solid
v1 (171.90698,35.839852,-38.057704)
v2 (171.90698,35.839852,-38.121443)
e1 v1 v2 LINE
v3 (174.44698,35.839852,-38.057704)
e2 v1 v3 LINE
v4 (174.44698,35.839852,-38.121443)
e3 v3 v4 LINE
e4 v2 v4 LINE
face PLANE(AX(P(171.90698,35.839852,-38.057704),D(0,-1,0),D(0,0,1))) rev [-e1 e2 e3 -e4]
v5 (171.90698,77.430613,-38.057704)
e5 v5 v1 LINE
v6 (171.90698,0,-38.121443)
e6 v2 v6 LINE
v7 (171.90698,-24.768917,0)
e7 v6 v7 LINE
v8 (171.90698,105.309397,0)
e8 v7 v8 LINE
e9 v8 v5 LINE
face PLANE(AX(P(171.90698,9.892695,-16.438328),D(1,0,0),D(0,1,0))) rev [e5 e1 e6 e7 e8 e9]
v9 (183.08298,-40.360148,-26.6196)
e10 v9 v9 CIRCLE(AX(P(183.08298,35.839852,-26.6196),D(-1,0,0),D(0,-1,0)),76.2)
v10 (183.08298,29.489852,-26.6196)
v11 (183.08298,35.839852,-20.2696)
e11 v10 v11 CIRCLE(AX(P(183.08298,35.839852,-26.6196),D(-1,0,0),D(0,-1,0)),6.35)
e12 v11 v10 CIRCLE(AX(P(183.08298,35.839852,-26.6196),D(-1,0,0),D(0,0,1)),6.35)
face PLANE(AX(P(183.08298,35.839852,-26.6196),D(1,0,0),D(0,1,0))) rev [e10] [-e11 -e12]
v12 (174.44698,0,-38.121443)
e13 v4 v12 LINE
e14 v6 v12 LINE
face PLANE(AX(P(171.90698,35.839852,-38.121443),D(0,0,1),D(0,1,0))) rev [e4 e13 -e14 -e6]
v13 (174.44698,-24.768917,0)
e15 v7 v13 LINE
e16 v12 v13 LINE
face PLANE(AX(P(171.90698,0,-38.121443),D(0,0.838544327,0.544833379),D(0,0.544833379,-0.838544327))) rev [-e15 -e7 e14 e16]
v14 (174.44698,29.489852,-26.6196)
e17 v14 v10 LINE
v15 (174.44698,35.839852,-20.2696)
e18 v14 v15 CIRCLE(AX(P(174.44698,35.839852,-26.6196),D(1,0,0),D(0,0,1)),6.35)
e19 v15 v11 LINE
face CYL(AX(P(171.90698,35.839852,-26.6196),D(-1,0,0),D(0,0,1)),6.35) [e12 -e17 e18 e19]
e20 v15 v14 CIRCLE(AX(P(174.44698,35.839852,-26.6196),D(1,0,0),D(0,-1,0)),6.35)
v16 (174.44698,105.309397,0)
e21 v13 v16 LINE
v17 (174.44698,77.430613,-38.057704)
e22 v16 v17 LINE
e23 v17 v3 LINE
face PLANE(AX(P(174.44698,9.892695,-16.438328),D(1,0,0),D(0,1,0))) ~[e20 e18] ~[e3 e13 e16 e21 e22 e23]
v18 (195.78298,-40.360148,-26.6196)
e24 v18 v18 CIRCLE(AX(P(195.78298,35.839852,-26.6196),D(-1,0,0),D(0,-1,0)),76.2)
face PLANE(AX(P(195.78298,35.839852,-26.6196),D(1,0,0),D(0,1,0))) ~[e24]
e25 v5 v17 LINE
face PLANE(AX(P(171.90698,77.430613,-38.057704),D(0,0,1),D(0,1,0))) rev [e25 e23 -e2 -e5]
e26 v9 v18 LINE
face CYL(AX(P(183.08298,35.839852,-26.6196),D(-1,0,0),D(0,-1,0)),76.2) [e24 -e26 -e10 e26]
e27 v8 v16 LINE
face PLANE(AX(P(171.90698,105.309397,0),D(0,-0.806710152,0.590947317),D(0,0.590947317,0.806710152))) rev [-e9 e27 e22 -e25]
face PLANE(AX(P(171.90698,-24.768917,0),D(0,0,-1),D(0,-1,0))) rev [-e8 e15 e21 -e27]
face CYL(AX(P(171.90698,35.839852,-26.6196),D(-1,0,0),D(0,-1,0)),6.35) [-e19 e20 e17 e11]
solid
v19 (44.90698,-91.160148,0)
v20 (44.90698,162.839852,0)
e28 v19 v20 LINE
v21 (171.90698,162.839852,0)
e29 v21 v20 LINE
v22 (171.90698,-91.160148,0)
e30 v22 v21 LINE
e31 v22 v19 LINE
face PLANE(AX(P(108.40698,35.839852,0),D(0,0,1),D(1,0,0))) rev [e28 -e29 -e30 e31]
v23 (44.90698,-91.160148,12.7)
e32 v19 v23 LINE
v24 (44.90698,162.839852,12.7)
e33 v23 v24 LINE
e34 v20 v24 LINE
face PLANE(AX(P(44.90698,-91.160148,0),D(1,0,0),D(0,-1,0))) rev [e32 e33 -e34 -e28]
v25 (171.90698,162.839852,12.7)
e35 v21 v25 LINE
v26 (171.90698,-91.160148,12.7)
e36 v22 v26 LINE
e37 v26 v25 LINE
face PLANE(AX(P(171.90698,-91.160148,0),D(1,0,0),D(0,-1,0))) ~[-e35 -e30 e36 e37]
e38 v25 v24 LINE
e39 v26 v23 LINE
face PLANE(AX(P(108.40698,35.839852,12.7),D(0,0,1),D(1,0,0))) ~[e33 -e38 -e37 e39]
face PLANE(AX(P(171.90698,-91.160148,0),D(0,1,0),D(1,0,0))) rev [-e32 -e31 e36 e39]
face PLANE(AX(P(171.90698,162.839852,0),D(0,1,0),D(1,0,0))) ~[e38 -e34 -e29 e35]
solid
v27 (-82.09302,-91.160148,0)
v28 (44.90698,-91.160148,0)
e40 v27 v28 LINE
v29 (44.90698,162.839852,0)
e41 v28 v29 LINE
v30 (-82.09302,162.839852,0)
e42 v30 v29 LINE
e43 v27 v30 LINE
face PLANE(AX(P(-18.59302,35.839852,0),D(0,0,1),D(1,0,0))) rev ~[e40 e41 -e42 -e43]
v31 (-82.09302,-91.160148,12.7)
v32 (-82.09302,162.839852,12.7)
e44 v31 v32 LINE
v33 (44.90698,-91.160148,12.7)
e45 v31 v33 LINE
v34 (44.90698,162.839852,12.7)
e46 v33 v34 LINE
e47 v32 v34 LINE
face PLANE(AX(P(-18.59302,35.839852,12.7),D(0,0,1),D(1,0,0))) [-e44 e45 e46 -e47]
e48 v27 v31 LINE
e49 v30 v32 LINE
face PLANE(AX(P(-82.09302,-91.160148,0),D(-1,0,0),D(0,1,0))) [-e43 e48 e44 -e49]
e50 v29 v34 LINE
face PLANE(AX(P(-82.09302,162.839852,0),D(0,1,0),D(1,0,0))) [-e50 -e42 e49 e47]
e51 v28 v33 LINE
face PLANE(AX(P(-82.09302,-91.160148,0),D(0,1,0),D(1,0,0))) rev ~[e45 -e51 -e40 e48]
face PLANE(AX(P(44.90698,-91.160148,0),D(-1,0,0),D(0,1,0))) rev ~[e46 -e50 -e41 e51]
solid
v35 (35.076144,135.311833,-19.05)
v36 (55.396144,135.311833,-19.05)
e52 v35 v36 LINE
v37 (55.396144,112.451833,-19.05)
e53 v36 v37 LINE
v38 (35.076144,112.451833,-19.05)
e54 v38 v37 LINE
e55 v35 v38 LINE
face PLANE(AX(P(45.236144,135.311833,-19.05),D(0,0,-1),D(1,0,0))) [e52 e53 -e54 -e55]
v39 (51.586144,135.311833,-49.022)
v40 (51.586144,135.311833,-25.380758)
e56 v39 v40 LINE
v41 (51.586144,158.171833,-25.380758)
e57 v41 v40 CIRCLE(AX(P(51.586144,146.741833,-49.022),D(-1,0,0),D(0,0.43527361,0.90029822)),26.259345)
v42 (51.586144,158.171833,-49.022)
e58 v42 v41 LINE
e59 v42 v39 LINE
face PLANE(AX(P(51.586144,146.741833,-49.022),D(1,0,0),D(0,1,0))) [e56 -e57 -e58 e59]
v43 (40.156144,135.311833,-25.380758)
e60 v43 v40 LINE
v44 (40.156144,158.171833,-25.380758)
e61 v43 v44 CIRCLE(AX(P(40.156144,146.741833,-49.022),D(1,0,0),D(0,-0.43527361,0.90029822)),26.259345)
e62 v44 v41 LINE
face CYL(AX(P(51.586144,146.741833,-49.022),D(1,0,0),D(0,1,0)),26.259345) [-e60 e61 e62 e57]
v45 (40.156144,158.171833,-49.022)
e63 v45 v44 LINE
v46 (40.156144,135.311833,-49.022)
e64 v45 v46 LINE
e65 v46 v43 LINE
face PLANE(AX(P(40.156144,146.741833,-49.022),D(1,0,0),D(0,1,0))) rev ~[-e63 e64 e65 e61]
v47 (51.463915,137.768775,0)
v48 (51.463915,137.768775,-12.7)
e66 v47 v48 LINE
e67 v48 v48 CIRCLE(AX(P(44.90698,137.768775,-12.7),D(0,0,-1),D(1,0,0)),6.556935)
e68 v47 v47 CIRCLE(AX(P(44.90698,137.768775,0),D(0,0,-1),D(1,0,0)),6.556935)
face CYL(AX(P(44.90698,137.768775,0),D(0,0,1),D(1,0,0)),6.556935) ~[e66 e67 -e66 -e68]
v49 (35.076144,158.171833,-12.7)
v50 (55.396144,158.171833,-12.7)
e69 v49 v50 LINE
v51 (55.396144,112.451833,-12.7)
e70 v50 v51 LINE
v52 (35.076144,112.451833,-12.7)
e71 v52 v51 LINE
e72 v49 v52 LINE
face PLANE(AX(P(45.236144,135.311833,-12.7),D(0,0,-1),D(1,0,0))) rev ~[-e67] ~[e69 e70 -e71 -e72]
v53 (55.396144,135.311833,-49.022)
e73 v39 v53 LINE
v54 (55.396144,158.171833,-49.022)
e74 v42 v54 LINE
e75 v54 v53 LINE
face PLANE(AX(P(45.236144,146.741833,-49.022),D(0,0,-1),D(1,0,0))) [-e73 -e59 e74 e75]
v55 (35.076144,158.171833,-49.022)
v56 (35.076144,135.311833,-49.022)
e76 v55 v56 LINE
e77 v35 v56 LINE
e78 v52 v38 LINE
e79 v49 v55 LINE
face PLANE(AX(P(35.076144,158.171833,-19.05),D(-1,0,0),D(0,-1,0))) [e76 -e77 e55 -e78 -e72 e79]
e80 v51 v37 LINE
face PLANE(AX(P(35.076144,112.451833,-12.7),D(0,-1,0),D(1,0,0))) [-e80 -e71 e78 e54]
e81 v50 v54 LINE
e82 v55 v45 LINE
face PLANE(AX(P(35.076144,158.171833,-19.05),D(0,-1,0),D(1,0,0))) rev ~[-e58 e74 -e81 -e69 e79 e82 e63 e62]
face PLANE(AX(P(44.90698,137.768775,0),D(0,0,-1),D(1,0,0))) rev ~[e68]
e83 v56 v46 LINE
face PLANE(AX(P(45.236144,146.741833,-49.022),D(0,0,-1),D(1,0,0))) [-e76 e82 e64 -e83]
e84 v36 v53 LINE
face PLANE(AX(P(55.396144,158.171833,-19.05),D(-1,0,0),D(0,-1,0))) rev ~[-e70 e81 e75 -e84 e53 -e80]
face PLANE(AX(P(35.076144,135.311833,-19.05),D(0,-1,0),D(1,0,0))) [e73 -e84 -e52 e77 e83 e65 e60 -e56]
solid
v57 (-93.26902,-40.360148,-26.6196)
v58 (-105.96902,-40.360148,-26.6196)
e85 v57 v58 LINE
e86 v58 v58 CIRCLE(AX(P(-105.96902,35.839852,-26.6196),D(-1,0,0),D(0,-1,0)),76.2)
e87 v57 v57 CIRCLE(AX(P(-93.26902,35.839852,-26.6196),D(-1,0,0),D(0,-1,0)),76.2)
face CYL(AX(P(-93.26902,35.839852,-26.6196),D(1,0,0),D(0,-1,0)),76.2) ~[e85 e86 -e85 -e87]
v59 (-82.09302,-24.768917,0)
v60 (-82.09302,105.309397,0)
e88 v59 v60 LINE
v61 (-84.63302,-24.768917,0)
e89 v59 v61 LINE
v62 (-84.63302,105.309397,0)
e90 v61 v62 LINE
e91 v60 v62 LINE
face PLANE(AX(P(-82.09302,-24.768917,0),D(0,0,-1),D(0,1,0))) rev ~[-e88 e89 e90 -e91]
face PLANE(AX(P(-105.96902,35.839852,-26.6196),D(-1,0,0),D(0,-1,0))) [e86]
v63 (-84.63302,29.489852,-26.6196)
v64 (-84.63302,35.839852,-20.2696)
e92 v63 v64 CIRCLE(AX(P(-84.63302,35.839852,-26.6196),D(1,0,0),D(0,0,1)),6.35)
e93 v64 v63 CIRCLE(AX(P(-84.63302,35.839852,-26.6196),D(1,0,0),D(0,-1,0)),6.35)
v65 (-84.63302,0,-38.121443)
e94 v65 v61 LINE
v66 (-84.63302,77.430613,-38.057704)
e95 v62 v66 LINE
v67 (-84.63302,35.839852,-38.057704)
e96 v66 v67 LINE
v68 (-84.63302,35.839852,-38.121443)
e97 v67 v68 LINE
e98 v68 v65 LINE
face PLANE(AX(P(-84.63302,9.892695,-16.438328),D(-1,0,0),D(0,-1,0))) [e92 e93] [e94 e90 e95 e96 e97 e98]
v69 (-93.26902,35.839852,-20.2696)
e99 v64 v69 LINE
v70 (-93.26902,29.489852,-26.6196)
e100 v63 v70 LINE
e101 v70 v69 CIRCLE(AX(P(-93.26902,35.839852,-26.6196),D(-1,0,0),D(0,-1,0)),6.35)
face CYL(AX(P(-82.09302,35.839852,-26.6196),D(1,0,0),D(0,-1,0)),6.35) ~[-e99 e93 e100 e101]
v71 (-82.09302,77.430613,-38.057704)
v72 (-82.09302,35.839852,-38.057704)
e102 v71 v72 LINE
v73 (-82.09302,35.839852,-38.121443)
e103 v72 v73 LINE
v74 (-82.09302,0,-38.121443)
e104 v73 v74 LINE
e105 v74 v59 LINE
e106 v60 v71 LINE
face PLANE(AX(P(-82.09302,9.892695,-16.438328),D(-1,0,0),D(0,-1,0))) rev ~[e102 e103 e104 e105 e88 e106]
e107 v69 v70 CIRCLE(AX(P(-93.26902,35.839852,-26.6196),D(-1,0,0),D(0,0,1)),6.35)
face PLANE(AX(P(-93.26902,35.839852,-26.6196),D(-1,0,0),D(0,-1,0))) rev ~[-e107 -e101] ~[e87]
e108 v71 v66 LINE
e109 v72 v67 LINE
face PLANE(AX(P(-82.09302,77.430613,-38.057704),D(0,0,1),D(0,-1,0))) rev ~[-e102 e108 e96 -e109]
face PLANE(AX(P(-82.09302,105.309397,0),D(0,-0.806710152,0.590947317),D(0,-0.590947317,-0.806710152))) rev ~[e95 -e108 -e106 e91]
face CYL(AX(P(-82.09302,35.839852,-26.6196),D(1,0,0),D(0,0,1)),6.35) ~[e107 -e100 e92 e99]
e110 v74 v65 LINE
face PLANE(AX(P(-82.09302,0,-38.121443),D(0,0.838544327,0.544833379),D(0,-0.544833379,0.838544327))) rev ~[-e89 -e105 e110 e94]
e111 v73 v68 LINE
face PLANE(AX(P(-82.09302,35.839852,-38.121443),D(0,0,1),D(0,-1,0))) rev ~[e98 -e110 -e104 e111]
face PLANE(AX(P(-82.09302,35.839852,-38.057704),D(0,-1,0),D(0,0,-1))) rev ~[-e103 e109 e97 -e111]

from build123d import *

# Parameters (mm, degrees)
F0_W      = 127
F0_H      = 254
F1_DEPTH  = 12.7
F3_DEPTH  = 11.176
F4_R      = 76.2
F5_DEPTH  = 12.7
F7_DEPTH  = 2.54
F12_R     = 6.556935049
F13_DEPTH = 12.7
F14_W     = 20.32
F14_H     = 45.72
F15_DEPTH = 6.35
F16_W     = 20.32
F16_H     = 22.86
F17_DEPTH = 29.972
F19_START = -3.81
F18_R     = 26.2593452301
F19_DEPTH = 11.43


# Not quite as in the source:
# - a feature names something its author has since deleted; it is built from what else it names
# - the program builds the solid bodies; features that only make, move or delete a surface that nothing else refers to are left out


with BuildPart() as f1:
    # F0 (on Top) → F1 (new body)
    with BuildSketch(Plane.XY):
        with Locations((-18.5930197371, 35.8398522526)):
            Rectangle(F0_W, F0_H)
    extrude(amount=F1_DEPTH)


with BuildPart() as f3:
    # F2 (on face) → F3 (new body)
    with BuildSketch(Plane(origin=(-82.0930197371, 0, 0), x_dir=(0, -1, 0), z_dir=(-1, 0, 0))):
        with BuildLine():
            ThreePointArc((-35.8398522526, -20.2696001321), (-40.3299803131, -31.1097281926), (-29.4898522526, -26.6196001321))
            ThreePointArc((-29.4898522526, -26.6196001321), (-31.3497241921, -22.1294720716), (-35.8398522526, -20.2696001321))
        make_face()
    extrude(amount=F3_DEPTH)

    # F4 (on face) → F5 (join)
    with BuildSketch(Plane(origin=(-93.2690197371, 0, 0), x_dir=(0, -1, 0), z_dir=(-1, 0, 0))):
        with Locations((-35.8398522526, -26.6196001321)):
            Circle(F4_R)
    extrude(amount=F5_DEPTH)

    # F6 (on face) → F7 (join)
    with BuildSketch(Plane(origin=(-82.0930197371, 0, 0), x_dir=(0, -1, 0), z_dir=(-1, 0, 0))):
        Polygon((0, 0), (-35.8398522526, 0), (-35.8398522526, -38.0577035248), (-35.8398522526, -38.1214432418), (0, -38.1214432418), (24.76891689, 0), align=None)
        Polygon((-35.8398522526, -38.0577035248), (-35.8398522526, 0), (-77.4306133389, 0), (-105.3093969822, 0), (-77.4306133389, -38.0577035248), align=None)
    extrude(amount=F7_DEPTH)


with BuildPart() as f11_1:
    # F11: instance of F3
    add(f3.part.mirror(Plane.YZ.offset(44.9069802629)))


with BuildPart() as f11_2:
    # F11: instance of F1
    add(f1.part.mirror(Plane.YZ.offset(44.9069802629)))


with BuildPart() as f13:
    # F12 (on face) → F13 (new body)
    with BuildSketch(Plane(origin=(0, 0, 0), x_dir=(1, 0, 0), z_dir=(0, 0, -1))):
        with Locations((44.9069802629, -137.7687752247)):
            Circle(F12_R)
    extrude(amount=F13_DEPTH)

    # F14 (on face) → F15 (join)
    with BuildSketch(Plane(origin=(0, 0, -12.7), x_dir=(1, 0, 0), z_dir=(0, 0, -1))):
        with Locations((45.2361442149, -135.3118325615)):
            Rectangle(F14_W, F14_H)
    extrude(amount=F15_DEPTH)

    # F16 (on face) → F17 (join)
    with BuildSketch(Plane(origin=(0, 0, -19.05), x_dir=(1, 0, 0), z_dir=(0, 0, -1))):
        with Locations((45.2361442149, -146.7418325615)):
            Rectangle(F16_W, F16_H)
    extrude(amount=F17_DEPTH)

    # F18 (on face) → F19 (join)
    with BuildSketch(Plane.YZ.offset(55.3961442149).offset(F19_START)):
        with Locations((146.7418325615, -49.022)):
            Circle(F18_R)
    extrude(amount=-F19_DEPTH)


solid = Compound([f1.part, f3.part, f11_1.part, f11_2.part, f13.part])
